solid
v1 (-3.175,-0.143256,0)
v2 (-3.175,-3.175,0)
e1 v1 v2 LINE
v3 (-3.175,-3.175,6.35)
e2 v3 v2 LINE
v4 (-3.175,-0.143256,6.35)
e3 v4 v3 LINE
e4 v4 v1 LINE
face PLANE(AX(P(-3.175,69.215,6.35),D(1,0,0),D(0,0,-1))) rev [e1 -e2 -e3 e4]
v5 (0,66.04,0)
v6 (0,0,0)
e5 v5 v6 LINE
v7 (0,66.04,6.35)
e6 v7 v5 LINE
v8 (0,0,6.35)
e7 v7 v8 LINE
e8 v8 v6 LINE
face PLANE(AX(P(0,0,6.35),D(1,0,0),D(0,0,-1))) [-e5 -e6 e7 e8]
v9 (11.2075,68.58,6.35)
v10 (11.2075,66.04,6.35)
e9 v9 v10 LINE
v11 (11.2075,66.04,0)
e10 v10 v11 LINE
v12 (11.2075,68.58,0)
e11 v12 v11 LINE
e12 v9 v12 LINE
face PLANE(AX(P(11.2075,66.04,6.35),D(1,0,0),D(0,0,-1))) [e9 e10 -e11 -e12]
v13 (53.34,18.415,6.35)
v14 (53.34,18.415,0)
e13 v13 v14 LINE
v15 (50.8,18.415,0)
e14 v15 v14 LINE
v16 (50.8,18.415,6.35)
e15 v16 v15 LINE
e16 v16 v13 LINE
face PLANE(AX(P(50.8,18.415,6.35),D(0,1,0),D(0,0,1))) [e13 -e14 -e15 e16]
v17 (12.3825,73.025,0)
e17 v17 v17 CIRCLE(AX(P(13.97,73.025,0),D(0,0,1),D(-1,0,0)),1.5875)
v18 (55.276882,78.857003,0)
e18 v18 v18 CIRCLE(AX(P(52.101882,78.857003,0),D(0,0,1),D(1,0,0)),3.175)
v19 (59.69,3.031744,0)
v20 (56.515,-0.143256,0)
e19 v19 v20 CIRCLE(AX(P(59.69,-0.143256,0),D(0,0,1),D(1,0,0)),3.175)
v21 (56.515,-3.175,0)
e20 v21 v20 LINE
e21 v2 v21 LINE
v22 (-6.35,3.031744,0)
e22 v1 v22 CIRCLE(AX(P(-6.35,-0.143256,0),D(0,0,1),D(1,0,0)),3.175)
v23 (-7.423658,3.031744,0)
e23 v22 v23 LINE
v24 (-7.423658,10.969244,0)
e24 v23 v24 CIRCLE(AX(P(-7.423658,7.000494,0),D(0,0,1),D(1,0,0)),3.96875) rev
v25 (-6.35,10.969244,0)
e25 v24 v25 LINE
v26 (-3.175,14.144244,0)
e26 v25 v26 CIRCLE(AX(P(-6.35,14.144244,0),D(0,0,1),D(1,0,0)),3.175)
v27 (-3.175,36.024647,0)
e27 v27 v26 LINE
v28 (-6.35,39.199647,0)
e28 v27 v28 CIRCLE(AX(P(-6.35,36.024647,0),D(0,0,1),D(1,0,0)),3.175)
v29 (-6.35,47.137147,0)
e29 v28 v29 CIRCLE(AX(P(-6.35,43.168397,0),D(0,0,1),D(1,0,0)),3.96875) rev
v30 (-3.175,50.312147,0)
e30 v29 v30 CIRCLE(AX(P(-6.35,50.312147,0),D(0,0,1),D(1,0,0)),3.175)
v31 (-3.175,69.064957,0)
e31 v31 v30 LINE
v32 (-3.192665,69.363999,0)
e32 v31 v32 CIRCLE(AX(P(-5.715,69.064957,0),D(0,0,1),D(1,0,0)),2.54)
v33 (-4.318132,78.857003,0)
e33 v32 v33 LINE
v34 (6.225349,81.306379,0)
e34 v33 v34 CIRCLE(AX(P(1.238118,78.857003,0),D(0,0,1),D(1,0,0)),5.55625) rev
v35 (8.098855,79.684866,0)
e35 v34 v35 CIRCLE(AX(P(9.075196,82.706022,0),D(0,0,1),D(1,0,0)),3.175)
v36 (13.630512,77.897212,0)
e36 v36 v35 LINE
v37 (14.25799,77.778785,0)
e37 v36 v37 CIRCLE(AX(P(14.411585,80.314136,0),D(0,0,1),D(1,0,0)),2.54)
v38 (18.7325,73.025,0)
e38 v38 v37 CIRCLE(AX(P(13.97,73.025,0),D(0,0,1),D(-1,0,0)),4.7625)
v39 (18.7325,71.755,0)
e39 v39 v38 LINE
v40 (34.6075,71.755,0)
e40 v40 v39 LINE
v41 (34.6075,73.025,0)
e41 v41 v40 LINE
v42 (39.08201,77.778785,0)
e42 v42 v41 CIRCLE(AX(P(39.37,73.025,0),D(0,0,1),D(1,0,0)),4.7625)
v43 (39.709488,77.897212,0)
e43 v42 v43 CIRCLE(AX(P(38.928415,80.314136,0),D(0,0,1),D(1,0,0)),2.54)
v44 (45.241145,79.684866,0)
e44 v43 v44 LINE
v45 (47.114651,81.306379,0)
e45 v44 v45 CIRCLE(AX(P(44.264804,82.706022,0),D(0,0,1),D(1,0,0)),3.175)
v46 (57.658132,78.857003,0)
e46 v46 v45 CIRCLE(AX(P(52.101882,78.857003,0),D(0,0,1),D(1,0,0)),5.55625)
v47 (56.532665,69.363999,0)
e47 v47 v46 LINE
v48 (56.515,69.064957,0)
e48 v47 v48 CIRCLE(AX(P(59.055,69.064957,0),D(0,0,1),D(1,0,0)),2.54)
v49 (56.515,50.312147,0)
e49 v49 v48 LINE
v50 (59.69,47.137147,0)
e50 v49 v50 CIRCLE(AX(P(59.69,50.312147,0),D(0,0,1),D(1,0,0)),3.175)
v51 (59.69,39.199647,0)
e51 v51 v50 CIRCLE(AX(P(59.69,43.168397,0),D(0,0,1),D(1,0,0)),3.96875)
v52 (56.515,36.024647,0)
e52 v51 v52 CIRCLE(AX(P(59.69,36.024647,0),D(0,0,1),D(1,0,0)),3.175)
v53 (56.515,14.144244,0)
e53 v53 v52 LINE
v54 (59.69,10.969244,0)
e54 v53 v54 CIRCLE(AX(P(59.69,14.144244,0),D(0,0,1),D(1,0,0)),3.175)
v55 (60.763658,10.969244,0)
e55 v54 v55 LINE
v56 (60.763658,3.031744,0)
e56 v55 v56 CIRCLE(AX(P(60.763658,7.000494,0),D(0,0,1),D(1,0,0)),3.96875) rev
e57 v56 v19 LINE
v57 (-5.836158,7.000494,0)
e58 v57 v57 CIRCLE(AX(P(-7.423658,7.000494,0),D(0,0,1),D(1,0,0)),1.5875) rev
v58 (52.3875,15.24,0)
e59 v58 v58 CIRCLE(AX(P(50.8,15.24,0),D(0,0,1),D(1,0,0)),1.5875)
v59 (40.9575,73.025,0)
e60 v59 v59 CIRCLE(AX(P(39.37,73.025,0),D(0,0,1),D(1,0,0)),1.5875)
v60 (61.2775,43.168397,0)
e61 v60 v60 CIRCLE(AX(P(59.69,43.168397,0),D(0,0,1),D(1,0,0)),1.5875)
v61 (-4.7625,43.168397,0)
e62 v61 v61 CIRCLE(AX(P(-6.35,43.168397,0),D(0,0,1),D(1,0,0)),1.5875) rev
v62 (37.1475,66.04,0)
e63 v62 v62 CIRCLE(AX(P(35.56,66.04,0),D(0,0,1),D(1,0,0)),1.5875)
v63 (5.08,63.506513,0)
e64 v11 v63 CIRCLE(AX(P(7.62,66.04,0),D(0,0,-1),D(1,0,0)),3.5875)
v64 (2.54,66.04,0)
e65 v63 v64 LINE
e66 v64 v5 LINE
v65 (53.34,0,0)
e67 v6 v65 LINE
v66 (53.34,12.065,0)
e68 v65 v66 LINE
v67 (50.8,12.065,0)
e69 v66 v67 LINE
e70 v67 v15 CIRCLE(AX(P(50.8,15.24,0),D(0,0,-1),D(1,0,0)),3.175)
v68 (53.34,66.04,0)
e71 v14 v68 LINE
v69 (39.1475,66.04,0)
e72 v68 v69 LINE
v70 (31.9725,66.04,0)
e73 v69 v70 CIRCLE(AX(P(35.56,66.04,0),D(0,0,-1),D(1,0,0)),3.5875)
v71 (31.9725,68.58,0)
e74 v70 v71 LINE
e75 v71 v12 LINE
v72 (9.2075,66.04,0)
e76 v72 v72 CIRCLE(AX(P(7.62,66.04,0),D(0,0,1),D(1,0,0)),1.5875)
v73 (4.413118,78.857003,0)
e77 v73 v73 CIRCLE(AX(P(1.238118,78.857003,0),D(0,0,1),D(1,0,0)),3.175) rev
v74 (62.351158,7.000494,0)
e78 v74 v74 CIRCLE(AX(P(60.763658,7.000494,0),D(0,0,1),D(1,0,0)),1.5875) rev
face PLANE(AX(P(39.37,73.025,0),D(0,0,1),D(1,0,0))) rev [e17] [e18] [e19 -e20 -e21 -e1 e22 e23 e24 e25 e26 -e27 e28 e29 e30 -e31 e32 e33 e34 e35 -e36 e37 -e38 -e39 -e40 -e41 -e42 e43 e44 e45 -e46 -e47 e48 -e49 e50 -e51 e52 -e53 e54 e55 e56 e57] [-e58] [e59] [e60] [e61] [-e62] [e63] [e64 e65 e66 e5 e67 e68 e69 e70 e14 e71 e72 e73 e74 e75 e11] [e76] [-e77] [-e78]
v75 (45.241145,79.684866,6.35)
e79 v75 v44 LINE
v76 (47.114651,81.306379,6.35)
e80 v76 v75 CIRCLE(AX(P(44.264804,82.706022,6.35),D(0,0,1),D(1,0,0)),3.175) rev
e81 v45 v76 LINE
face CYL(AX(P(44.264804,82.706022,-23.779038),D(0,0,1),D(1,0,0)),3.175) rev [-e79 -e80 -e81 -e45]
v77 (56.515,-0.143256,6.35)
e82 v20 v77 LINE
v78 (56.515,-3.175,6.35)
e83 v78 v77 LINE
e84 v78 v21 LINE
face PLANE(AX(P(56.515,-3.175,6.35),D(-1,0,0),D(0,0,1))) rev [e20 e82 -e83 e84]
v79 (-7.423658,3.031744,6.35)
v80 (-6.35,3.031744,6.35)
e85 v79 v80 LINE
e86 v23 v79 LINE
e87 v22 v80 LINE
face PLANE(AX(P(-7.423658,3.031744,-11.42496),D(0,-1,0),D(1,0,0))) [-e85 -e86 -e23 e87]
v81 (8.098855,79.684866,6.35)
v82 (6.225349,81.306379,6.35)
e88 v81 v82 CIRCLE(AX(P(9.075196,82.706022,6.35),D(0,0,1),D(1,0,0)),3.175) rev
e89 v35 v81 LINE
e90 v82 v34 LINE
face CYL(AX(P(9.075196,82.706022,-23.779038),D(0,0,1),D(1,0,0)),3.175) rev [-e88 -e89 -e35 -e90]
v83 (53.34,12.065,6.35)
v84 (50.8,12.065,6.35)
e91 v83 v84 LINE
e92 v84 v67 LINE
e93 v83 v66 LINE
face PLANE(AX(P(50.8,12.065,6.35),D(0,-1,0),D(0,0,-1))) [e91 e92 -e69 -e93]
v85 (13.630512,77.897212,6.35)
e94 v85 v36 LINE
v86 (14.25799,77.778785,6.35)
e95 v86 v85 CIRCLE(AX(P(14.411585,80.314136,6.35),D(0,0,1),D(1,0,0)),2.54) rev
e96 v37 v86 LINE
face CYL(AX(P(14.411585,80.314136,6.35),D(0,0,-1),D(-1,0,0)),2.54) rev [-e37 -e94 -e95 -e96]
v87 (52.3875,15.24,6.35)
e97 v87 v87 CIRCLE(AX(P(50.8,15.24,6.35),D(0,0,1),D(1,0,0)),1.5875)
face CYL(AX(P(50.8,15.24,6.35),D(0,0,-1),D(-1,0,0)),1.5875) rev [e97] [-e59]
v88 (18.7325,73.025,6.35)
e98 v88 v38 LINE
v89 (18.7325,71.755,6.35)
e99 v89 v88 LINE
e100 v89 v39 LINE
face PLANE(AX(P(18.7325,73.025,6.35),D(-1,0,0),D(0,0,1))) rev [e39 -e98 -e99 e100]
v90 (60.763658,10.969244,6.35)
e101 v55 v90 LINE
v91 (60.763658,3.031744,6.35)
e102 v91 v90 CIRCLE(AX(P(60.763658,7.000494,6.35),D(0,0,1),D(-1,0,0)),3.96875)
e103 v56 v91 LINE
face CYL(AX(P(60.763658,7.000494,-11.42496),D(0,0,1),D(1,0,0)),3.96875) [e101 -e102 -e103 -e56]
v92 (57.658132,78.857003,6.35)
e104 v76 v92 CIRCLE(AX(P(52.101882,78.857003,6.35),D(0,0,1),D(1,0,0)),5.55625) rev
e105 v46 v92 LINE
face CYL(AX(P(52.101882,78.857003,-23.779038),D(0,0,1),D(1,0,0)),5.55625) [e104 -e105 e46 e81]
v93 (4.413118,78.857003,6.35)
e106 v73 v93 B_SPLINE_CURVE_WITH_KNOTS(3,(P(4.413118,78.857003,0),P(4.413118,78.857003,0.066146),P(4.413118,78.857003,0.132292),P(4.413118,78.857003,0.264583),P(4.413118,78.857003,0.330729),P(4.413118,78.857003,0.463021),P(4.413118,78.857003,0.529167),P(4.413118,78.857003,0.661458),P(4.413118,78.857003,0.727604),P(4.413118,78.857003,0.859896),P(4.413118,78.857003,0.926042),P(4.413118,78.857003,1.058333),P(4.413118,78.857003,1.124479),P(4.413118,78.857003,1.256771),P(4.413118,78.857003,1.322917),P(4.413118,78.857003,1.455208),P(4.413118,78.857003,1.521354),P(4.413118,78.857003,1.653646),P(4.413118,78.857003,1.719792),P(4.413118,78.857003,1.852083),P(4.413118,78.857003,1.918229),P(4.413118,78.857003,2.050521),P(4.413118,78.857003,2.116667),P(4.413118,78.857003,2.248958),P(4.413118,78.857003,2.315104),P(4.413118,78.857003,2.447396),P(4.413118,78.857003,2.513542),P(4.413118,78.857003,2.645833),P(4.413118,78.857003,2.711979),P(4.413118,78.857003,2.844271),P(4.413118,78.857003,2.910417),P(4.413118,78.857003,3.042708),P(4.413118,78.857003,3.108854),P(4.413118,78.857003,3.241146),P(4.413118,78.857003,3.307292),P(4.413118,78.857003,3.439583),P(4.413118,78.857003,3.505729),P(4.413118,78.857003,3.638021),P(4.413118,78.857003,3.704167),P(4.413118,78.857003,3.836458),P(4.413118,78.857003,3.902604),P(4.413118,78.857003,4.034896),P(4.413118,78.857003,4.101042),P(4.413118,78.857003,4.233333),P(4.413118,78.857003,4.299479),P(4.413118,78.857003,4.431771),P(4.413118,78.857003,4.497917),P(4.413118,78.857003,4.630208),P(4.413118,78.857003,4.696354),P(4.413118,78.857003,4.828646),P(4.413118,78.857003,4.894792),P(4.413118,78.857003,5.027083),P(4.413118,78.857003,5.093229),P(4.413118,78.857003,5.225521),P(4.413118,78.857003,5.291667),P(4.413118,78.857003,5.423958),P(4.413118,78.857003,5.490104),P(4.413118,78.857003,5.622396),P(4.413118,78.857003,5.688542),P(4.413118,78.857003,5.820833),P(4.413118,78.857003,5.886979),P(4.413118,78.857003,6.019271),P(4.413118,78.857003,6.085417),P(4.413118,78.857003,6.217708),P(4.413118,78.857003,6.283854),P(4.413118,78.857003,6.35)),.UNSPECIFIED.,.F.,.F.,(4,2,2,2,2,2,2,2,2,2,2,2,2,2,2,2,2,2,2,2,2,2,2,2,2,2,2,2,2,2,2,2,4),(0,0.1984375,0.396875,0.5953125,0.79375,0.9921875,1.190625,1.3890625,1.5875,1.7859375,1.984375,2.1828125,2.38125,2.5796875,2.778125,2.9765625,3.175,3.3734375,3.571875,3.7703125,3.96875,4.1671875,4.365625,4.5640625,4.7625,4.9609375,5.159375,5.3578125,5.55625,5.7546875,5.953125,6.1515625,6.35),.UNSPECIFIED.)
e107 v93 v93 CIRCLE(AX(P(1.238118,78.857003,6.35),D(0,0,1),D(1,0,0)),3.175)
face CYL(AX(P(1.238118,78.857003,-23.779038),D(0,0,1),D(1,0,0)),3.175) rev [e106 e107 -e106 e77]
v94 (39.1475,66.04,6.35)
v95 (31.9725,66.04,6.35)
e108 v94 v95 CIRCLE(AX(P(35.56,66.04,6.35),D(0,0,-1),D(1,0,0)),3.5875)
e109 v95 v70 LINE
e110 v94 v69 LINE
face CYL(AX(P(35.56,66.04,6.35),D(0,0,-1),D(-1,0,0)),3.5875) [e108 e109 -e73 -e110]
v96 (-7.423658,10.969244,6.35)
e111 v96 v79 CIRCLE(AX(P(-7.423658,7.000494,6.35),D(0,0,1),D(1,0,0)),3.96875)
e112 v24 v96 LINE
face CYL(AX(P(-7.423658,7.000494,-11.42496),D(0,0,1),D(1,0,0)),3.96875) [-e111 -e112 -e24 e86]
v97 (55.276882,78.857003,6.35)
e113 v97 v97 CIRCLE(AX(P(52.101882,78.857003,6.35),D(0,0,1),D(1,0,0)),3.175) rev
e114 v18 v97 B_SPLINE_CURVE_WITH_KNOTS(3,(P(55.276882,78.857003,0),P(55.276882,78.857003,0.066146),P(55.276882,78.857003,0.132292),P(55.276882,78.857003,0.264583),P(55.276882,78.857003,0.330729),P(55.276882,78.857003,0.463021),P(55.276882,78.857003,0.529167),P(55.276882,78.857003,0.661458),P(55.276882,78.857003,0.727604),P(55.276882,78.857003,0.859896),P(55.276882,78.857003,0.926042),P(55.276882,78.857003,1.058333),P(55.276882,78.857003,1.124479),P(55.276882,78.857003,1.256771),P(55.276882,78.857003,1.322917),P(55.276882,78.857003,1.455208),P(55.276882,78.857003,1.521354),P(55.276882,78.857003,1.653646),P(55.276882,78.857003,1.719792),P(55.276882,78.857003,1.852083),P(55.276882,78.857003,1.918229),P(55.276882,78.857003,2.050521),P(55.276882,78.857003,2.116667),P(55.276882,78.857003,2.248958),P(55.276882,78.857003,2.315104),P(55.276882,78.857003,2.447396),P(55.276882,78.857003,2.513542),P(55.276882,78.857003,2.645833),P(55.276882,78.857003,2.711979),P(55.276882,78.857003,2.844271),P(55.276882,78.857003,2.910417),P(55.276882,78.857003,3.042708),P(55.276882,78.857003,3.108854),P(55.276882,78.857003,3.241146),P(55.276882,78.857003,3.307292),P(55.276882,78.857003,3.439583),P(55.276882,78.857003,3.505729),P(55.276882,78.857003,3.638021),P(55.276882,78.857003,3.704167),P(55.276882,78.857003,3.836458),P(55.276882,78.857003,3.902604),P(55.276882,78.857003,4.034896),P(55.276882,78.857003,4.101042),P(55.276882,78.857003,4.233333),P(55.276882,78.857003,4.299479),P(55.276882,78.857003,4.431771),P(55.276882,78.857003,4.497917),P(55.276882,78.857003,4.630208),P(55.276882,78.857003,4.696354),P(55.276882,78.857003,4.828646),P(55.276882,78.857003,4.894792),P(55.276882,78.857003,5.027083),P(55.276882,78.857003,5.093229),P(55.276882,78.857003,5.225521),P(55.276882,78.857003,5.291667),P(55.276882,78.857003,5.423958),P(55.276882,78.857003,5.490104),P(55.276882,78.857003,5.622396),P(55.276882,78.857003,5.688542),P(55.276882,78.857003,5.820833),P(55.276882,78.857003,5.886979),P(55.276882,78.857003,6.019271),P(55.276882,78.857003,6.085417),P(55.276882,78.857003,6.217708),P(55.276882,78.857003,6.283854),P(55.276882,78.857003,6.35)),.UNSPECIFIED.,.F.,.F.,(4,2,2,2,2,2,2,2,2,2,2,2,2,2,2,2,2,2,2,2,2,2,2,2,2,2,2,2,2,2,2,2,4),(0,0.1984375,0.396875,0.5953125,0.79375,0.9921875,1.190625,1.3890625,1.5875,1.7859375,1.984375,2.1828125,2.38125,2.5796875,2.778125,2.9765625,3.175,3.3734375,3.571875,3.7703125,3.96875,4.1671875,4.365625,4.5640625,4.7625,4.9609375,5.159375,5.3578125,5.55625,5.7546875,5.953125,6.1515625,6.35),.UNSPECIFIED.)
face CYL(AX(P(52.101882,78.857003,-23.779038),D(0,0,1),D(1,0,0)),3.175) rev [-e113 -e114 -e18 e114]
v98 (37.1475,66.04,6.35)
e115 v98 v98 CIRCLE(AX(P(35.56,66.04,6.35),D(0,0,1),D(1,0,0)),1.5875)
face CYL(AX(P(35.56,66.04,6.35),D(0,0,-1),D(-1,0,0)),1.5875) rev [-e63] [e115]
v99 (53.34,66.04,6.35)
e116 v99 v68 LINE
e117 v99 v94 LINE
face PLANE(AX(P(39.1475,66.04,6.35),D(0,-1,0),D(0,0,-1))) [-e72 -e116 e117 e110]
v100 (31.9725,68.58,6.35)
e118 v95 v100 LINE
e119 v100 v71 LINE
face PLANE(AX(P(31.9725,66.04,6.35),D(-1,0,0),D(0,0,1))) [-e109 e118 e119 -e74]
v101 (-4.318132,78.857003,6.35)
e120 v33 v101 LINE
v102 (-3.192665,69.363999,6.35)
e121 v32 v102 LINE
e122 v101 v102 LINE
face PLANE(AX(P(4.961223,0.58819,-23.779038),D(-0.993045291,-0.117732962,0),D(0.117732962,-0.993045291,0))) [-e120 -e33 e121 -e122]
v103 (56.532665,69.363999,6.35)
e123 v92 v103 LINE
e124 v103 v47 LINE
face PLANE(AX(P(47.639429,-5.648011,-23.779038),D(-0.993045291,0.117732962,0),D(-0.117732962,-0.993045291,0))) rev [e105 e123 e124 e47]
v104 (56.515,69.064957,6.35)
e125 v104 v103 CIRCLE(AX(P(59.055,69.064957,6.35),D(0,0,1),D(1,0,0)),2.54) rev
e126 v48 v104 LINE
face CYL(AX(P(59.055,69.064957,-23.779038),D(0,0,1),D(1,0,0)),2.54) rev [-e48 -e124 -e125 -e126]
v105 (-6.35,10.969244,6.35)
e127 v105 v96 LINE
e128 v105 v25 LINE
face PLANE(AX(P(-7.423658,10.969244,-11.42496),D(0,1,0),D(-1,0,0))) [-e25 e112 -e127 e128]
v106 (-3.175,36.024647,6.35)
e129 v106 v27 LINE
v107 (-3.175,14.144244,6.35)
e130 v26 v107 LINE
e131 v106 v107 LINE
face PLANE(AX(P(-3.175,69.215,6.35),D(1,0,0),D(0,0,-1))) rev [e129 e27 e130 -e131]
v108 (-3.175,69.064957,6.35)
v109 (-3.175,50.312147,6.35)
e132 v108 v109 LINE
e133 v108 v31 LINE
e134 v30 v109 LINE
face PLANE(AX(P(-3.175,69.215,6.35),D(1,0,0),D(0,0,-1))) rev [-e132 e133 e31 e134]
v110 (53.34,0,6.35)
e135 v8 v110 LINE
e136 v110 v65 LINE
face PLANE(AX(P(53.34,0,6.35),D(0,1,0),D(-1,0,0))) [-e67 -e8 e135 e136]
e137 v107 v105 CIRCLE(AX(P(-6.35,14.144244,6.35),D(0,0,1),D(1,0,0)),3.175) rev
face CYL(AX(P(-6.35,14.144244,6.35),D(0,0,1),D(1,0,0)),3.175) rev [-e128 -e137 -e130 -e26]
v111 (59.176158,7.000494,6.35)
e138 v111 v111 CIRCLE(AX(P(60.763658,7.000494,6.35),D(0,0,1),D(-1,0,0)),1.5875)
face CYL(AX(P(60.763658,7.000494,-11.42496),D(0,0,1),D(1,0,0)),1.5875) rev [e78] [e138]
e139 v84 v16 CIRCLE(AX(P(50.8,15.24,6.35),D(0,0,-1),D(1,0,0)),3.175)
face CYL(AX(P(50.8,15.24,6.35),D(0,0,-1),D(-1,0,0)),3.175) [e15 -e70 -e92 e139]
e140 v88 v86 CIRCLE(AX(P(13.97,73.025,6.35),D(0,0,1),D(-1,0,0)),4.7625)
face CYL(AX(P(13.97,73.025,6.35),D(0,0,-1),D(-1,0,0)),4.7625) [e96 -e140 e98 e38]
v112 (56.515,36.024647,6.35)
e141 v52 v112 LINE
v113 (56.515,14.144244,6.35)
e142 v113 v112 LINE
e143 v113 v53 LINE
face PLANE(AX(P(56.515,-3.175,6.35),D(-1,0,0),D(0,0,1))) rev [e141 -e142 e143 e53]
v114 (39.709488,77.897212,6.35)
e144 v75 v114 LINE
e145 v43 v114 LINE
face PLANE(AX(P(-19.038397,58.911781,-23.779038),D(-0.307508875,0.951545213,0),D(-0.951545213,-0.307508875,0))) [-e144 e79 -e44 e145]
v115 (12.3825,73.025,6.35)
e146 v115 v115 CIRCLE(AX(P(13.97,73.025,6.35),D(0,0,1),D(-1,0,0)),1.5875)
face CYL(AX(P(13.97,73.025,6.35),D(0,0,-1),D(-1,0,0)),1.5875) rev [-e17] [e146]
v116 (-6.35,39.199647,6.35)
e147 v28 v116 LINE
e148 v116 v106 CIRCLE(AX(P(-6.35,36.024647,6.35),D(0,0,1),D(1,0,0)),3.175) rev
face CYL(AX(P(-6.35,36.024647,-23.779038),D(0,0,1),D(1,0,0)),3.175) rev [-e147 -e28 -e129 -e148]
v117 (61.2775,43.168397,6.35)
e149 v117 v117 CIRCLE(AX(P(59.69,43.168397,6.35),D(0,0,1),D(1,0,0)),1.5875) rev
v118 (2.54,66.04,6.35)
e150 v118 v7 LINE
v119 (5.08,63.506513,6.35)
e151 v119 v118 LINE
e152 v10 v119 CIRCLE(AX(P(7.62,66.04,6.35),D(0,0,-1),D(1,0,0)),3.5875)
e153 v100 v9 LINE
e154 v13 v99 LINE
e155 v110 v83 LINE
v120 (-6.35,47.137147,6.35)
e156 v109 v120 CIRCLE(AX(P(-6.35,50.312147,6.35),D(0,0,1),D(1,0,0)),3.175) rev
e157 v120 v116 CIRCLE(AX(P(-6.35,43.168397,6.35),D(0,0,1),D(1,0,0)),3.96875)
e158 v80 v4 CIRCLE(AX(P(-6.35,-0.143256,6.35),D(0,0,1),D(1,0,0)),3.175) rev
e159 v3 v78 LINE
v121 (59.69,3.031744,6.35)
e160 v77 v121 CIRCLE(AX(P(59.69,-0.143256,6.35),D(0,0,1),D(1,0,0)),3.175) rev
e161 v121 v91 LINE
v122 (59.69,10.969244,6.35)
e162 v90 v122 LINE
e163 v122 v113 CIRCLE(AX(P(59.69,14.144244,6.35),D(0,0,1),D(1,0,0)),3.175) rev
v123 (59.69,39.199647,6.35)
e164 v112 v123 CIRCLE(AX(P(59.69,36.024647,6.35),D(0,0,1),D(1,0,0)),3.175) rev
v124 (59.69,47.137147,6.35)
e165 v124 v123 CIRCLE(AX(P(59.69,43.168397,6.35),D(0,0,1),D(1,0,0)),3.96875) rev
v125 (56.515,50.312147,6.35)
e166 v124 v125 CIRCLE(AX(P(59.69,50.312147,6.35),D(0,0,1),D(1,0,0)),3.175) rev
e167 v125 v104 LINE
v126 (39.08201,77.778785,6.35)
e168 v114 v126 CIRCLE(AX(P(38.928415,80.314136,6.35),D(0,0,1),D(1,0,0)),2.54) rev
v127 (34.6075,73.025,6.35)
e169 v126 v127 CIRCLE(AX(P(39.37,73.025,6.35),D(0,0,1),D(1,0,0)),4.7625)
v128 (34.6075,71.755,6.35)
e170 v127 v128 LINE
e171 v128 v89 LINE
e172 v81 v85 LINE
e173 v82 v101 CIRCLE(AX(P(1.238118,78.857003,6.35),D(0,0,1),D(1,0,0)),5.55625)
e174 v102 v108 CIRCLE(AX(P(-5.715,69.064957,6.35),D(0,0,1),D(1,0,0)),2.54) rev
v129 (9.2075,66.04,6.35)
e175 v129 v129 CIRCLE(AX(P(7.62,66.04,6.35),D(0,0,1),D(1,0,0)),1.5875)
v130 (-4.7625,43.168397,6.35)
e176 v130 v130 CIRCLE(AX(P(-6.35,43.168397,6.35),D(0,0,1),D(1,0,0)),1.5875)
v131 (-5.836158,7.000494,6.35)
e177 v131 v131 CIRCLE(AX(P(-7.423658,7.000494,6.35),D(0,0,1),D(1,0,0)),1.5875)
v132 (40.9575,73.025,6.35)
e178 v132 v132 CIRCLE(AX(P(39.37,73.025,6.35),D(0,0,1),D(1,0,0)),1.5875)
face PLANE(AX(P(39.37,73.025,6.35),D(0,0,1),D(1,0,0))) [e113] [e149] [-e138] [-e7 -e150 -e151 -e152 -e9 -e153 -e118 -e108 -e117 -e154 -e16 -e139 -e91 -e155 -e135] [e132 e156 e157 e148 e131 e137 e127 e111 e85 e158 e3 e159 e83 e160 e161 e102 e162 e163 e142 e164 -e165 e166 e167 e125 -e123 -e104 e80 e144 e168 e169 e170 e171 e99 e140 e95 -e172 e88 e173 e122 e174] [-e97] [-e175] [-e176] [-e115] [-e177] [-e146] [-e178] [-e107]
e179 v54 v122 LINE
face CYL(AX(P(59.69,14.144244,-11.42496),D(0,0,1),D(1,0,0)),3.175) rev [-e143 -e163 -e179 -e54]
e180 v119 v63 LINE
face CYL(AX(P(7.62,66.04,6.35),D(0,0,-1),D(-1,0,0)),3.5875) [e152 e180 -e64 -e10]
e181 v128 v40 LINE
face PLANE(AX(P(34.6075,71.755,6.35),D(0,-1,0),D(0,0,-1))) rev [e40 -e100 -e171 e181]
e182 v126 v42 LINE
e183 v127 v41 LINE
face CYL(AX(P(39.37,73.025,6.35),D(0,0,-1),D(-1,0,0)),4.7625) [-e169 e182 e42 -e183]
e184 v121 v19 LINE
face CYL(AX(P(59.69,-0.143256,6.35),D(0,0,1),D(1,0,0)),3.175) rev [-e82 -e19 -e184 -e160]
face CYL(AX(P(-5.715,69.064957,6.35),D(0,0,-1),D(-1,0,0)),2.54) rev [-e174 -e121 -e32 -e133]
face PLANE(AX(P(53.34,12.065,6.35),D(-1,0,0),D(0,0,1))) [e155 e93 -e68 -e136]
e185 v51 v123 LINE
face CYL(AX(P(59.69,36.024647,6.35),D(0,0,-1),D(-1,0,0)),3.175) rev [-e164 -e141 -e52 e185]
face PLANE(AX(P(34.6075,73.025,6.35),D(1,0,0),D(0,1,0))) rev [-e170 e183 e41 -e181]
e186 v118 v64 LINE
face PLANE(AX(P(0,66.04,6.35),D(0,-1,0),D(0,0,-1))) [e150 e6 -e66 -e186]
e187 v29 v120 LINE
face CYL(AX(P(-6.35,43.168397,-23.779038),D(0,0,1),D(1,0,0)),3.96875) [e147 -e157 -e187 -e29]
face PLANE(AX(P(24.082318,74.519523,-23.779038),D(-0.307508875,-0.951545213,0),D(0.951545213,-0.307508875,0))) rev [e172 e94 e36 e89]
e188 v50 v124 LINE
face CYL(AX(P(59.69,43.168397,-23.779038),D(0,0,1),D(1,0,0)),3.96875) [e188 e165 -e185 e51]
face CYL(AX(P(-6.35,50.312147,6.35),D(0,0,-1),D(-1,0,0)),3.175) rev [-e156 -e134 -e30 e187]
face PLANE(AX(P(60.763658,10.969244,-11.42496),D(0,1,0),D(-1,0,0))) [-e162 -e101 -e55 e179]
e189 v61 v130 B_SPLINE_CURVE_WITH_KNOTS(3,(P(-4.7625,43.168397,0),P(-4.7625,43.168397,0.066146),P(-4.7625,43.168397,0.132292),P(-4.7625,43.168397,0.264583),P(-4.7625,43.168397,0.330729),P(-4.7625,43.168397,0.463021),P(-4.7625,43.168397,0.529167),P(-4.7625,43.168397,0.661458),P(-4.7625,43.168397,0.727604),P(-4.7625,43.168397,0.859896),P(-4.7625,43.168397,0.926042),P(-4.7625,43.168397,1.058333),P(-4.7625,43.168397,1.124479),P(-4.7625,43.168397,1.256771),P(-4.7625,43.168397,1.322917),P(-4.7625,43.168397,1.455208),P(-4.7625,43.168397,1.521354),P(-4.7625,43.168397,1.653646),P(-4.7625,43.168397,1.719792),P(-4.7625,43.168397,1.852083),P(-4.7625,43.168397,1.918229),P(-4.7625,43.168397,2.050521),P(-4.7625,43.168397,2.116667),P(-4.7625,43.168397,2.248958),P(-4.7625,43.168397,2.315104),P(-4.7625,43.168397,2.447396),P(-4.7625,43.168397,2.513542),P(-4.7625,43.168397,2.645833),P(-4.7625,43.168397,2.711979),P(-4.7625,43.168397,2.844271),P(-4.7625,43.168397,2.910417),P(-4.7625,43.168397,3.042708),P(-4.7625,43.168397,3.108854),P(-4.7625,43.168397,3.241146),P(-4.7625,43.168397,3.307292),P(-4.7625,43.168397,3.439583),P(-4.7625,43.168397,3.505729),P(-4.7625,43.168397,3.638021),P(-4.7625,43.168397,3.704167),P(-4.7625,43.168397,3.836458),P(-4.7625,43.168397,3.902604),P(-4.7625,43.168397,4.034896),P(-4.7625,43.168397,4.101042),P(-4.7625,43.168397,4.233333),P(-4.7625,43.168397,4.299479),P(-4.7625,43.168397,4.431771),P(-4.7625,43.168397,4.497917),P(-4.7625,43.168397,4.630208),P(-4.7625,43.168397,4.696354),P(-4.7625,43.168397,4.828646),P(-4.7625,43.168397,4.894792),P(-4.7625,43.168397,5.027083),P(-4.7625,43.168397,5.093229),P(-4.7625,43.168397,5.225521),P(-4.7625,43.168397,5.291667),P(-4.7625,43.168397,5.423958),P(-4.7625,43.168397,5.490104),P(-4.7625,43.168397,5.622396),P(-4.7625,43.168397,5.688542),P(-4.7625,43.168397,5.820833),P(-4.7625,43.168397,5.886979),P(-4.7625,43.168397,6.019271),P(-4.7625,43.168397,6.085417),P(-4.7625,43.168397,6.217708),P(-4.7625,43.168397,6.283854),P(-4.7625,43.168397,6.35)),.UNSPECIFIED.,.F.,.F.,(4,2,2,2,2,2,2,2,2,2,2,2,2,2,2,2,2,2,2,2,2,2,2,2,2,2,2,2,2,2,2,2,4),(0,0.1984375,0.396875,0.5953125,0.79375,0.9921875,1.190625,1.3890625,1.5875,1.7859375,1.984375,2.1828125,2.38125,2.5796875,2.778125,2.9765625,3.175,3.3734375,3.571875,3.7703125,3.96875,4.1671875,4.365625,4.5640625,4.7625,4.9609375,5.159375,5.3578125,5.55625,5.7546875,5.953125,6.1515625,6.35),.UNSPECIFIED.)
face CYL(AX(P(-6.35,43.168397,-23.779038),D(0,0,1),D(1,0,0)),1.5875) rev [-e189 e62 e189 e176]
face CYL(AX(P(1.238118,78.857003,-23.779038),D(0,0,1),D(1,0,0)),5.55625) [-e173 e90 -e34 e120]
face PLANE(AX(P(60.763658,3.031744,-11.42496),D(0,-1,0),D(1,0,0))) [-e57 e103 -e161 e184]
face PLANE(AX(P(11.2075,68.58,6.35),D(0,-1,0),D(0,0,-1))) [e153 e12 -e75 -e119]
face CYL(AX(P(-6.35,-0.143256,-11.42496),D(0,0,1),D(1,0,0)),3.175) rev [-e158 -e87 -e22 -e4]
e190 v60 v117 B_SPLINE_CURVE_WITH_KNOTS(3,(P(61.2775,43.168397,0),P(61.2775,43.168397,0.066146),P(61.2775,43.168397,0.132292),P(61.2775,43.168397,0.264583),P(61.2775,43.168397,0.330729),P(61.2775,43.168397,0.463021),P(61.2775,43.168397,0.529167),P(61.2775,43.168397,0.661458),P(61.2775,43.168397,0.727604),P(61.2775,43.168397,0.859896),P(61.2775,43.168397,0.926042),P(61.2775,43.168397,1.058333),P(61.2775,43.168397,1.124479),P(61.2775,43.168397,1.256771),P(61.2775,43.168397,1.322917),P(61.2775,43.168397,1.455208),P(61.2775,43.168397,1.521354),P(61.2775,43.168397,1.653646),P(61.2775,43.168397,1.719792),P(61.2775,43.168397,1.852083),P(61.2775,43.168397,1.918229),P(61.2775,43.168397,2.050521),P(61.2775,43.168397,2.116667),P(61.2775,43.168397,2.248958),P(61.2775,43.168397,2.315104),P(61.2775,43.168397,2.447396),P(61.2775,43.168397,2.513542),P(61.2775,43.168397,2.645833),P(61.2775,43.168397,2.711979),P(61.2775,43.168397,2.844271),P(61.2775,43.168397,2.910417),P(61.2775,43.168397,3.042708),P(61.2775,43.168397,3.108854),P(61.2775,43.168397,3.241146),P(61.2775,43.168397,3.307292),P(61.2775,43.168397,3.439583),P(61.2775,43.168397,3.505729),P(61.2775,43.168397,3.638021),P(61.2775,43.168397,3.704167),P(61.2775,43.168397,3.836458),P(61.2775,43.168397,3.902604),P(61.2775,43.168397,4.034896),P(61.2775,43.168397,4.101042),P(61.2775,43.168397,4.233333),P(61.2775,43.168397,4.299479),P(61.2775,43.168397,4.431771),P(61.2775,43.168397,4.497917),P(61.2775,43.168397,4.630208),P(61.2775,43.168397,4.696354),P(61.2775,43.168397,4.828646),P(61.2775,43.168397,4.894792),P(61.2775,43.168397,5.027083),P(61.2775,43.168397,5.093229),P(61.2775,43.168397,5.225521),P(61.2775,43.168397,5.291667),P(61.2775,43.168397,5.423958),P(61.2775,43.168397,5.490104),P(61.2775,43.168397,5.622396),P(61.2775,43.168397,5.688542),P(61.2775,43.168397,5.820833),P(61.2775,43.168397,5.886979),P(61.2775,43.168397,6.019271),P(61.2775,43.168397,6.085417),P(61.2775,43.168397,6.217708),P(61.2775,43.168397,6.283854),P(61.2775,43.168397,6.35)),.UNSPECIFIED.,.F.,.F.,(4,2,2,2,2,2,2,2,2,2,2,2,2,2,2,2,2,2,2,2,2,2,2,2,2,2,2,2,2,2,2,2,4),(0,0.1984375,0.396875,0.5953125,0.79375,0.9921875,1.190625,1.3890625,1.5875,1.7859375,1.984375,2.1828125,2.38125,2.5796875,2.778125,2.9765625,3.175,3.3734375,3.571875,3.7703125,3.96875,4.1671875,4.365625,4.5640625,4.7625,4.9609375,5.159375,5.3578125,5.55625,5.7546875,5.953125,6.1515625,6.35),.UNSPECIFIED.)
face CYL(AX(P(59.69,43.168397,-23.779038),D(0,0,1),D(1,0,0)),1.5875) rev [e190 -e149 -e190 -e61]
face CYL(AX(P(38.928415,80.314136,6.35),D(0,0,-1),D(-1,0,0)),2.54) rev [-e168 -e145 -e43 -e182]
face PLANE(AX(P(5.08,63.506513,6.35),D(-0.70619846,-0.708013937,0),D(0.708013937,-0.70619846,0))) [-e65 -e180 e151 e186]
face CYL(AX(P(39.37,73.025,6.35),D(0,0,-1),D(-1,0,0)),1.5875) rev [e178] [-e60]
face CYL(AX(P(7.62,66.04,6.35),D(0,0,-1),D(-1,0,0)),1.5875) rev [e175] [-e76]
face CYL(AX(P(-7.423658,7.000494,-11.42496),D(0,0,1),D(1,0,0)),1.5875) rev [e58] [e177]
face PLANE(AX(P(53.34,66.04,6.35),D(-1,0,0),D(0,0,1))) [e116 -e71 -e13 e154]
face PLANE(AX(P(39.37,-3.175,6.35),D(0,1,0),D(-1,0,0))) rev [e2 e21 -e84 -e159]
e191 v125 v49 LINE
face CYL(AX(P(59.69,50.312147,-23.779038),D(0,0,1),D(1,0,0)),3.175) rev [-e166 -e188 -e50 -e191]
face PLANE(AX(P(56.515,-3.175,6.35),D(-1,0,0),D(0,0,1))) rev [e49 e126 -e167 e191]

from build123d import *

# Parameters (mm, degrees)
SKETCH1_R           = 1.5875
BOSS_EXTRUDE1_DEPTH = 6.35
SKETCH3_R           = 1.5875
BOSS_EXTRUDE2_DEPTH = 6.35
FILLET1_R           = 3.175
BOSS_EXTRUDE3_START = -6.35
SKETCH4_R           = 3.175
SKETCH4_R_2         = 1.5875
BOSS_EXTRUDE3_DEPTH = 6.35
FILLET2_R           = 3.175
FILLET3_R           = 2.54


with BuildPart() as part:
    # Sketch1 → Boss-Extrude1 (new body)
    with BuildSketch(Plane.XY):
        with BuildLine():
            Line((13.97, -3.175), (39.37, -3.175))
            Line((39.37, -3.175), (56.515, -3.175))
            Line((56.515, -3.175), (56.515, 69.215))
            Line((56.515, 69.215), (41.625085175, 77.219758289))
            ThreePointArc((41.625085175, 77.219758289), (36.926481727, 77.112863097), (34.6075, 73.025))
            Line((34.6075, 73.025), (34.6075, 71.755))
            Line((34.6075, 71.755), (18.7325, 71.755))
            Line((18.7325, 71.755), (18.7325, 73.025))
            ThreePointArc((18.7325, 73.025), (16.413518273, 77.112863097), (11.714914825, 77.219758289))
            Line((11.714914825, 77.219758289), (-3.175, 69.215))
            Line((-3.175, 69.215), (-3.175, -3.175))
            Line((-3.175, -3.175), (13.97, -3.175))
        make_face()
        with Locations((35.56, 66.04)):
            Circle(SKETCH1_R, mode=Mode.SUBTRACT)
        with Locations((7.62, 66.04)):
            Circle(SKETCH1_R, mode=Mode.SUBTRACT)
        with Locations((50.8, 15.24)):
            Circle(SKETCH1_R, mode=Mode.SUBTRACT)
        with Locations((39.37, 73.025)):
            Circle(SKETCH1_R, mode=Mode.SUBTRACT)
        with Locations(Location((13.97, 73.025, 0), (0, 0, 180))):
            Circle(SKETCH1_R, mode=Mode.SUBTRACT)
        with BuildLine():
            Line((0, 11.093834149), (0, 16.5575))
            Line((0, 16.5575), (0, 66.04))
            Line((0, 66.04), (2.54, 66.04))
            Line((2.54, 66.04), (5.08, 63.506513025))
            ThreePointArc((5.08, 63.506513025), (8.990749111, 62.724701654), (11.2075, 66.04))
            Line((11.2075, 66.04), (11.2075, 68.58))
            Line((11.2075, 68.58), (31.9725, 68.58))
            Line((31.9725, 68.58), (31.9725, 66.04))
            ThreePointArc((31.9725, 66.04), (35.56, 62.4525), (39.1475, 66.04))
            Line((39.1475, 66.04), (40.386, 66.04))
            Line((40.386, 66.04), (53.34, 66.04))
            Line((53.34, 66.04), (53.34, 18.415))
            Line((53.34, 18.415), (50.8, 18.415))
            ThreePointArc((50.8, 18.415), (47.625, 15.24), (50.8, 12.065))
            Line((50.8, 12.065), (53.34, 12.065))
            Line((53.34, 12.065), (53.34, 0))
            Line((53.34, 0), (0, 0))
            Line((0, 0), (0, 11.093834149))
        make_face(mode=Mode.SUBTRACT)
    extrude(amount=BOSS_EXTRUDE1_DEPTH)

    # Sketch3 → Boss-Extrude2 (add)
    # profile 1 of 2: a face of its own
    with BuildSketch(Plane.XY.offset(6.35)):
        with BuildLine():
            Line((-7.423658, 10.969244), (-3.175, 10.969244))
            Line((-3.175, 10.969244), (-3.175, 3.031744))
            Line((-3.175, 3.031744), (-7.423658, 3.031744))
            ThreePointArc((-7.423658, 3.031744), (-11.392408, 7.000494), (-7.423658, 10.969244))
        make_face()
        with Locations((-7.423658, 7.000494)):
            Circle(SKETCH3_R, mode=Mode.SUBTRACT)
    # profile 2 of 2: a face of its own
    with BuildSketch(Plane.XY.offset(6.35)):
        with BuildLine():
            Line((56.515, 3.031744), (56.515, 10.969244))
            Line((56.515, 10.969244), (60.763658, 10.969244))
            ThreePointArc((60.763658, 10.969244), (64.732408, 7.000494), (60.763658, 3.031744))
            Line((60.763658, 3.031744), (56.515, 3.031744))
        make_face()
        with Locations((60.763658, 7.000494)):
            Circle(SKETCH3_R, mode=Mode.SUBTRACT)
    extrude(amount=-BOSS_EXTRUDE2_DEPTH)

    # Fillet1
    fillet1_edges = [part.edges().sort_by_distance(p)[0] for p in [
        (56.515, 3.031744, 3.175),
        (56.515, 10.969244, 3.175),
        (-3.175, 10.969244, 3.175),
        (-3.175, 3.031744, 3.175),
    ]]
    fillet(fillet1_edges, radius=FILLET1_R)

    # Sketch4 → Boss-Extrude3 (add)
    # profile 1 of 4: a face of its own
    with BuildSketch(Plane.XY.offset(6.35).offset(BOSS_EXTRUDE3_START)):
        with BuildLine():
            Line((-4.164100811, 77.557794463), (-3.175, 69.215))
            Line((-3.175, 69.215), (11.714914825, 77.219758289))
            ThreePointArc((11.714914825, 77.219758289), (12.807272625, 77.643384057), (13.97, 77.7875))
            Line((13.97, 77.7875), (6.640337345, 80.156211745))
            ThreePointArc((6.640337345, 80.156211745), (0.583964497, 84.374611001), (-4.318131733, 78.857003104))
            Line((-4.318131733, 78.857003104), (-4.164100811, 77.557794463))
        make_face()
        with Locations((1.238118267, 78.857003104)):
            Circle(SKETCH4_R, mode=Mode.SUBTRACT)
    # profile 2 of 4: a face of its own
    with BuildSketch(Plane.XY.offset(6.35).offset(BOSS_EXTRUDE3_START)):
        with BuildLine():
            Line((41.625085175, 77.219758289), (56.515, 69.215))
            Line((56.515, 69.215), (57.504100811, 77.557794463))
            Line((57.504100811, 77.557794463), (57.658131733, 78.857003104))
            ThreePointArc((57.658131733, 78.857003104), (52.756035503, 84.374611001), (46.699662655, 80.156211745))
            Line((46.699662655, 80.156211745), (39.37, 77.7875))
            ThreePointArc((39.37, 77.7875), (40.532727375, 77.643384057), (41.625085175, 77.219758289))
        make_face()
        with Locations((52.101881733, 78.857003104)):
            Circle(SKETCH4_R, mode=Mode.SUBTRACT)
    # profile 3 of 4: a face of its own
    with BuildSketch(Plane.XY.offset(6.35).offset(BOSS_EXTRUDE3_START)):
        with BuildLine():
            Line((56.515, 47.137146639), (56.515, 39.199646639))
            Line((56.515, 39.199646639), (59.69, 39.199646639))
            ThreePointArc((59.69, 39.199646639), (63.65875, 43.168396639), (59.69, 47.137146639))
            Line((59.69, 47.137146639), (56.515, 47.137146639))
        make_face()
        with Locations((59.69, 43.168396639)):
            Circle(SKETCH4_R_2, mode=Mode.SUBTRACT)
    # profile 4 of 4: a face of its own
    with BuildSketch(Plane.XY.offset(6.35).offset(BOSS_EXTRUDE3_START)):
        with BuildLine():
            Line((-3.175, 47.137146639), (-6.35, 47.137146639))
            ThreePointArc((-6.35, 47.137146639), (-10.31875, 43.168396639), (-6.35, 39.199646639))
            Line((-6.35, 39.199646639), (-3.175, 39.199646639))
            Line((-3.175, 39.199646639), (-3.175, 47.137146639))
        make_face()
        with Locations((-6.35, 43.168396639)):
            Circle(SKETCH4_R_2, mode=Mode.SUBTRACT)
    extrude(amount=BOSS_EXTRUDE3_DEPTH)

    # Fillet2
    fillet2_edges = [part.edges().sort_by_distance(p)[0] for p in [
        (46.699662655, 80.156211745, 3.175),
        (6.640337345, 80.156211745, 3.175),
        (-3.175, 47.137146639, 3.175),
        (56.515, 47.137146639, 3.175),
        (56.515, 39.199646639, 3.175),
        (-3.175, 39.199646639, 3.175),
    ]]
    fillet(fillet2_edges, radius=FILLET2_R - 0.0001)  # a hair under: the kernel refuses the full size

    # Fillet3
    fillet3_edges = [part.edges().sort_by_distance(p)[0] for p in [
        (-3.175, 69.215, 3.175),
        (13.97, 77.7875, 3.175),
        (56.515, 69.215, 3.175),
        (39.37, 77.7875, 3.175),
    ]]
    fillet(fillet3_edges, radius=FILLET3_R)


solid = part.part
